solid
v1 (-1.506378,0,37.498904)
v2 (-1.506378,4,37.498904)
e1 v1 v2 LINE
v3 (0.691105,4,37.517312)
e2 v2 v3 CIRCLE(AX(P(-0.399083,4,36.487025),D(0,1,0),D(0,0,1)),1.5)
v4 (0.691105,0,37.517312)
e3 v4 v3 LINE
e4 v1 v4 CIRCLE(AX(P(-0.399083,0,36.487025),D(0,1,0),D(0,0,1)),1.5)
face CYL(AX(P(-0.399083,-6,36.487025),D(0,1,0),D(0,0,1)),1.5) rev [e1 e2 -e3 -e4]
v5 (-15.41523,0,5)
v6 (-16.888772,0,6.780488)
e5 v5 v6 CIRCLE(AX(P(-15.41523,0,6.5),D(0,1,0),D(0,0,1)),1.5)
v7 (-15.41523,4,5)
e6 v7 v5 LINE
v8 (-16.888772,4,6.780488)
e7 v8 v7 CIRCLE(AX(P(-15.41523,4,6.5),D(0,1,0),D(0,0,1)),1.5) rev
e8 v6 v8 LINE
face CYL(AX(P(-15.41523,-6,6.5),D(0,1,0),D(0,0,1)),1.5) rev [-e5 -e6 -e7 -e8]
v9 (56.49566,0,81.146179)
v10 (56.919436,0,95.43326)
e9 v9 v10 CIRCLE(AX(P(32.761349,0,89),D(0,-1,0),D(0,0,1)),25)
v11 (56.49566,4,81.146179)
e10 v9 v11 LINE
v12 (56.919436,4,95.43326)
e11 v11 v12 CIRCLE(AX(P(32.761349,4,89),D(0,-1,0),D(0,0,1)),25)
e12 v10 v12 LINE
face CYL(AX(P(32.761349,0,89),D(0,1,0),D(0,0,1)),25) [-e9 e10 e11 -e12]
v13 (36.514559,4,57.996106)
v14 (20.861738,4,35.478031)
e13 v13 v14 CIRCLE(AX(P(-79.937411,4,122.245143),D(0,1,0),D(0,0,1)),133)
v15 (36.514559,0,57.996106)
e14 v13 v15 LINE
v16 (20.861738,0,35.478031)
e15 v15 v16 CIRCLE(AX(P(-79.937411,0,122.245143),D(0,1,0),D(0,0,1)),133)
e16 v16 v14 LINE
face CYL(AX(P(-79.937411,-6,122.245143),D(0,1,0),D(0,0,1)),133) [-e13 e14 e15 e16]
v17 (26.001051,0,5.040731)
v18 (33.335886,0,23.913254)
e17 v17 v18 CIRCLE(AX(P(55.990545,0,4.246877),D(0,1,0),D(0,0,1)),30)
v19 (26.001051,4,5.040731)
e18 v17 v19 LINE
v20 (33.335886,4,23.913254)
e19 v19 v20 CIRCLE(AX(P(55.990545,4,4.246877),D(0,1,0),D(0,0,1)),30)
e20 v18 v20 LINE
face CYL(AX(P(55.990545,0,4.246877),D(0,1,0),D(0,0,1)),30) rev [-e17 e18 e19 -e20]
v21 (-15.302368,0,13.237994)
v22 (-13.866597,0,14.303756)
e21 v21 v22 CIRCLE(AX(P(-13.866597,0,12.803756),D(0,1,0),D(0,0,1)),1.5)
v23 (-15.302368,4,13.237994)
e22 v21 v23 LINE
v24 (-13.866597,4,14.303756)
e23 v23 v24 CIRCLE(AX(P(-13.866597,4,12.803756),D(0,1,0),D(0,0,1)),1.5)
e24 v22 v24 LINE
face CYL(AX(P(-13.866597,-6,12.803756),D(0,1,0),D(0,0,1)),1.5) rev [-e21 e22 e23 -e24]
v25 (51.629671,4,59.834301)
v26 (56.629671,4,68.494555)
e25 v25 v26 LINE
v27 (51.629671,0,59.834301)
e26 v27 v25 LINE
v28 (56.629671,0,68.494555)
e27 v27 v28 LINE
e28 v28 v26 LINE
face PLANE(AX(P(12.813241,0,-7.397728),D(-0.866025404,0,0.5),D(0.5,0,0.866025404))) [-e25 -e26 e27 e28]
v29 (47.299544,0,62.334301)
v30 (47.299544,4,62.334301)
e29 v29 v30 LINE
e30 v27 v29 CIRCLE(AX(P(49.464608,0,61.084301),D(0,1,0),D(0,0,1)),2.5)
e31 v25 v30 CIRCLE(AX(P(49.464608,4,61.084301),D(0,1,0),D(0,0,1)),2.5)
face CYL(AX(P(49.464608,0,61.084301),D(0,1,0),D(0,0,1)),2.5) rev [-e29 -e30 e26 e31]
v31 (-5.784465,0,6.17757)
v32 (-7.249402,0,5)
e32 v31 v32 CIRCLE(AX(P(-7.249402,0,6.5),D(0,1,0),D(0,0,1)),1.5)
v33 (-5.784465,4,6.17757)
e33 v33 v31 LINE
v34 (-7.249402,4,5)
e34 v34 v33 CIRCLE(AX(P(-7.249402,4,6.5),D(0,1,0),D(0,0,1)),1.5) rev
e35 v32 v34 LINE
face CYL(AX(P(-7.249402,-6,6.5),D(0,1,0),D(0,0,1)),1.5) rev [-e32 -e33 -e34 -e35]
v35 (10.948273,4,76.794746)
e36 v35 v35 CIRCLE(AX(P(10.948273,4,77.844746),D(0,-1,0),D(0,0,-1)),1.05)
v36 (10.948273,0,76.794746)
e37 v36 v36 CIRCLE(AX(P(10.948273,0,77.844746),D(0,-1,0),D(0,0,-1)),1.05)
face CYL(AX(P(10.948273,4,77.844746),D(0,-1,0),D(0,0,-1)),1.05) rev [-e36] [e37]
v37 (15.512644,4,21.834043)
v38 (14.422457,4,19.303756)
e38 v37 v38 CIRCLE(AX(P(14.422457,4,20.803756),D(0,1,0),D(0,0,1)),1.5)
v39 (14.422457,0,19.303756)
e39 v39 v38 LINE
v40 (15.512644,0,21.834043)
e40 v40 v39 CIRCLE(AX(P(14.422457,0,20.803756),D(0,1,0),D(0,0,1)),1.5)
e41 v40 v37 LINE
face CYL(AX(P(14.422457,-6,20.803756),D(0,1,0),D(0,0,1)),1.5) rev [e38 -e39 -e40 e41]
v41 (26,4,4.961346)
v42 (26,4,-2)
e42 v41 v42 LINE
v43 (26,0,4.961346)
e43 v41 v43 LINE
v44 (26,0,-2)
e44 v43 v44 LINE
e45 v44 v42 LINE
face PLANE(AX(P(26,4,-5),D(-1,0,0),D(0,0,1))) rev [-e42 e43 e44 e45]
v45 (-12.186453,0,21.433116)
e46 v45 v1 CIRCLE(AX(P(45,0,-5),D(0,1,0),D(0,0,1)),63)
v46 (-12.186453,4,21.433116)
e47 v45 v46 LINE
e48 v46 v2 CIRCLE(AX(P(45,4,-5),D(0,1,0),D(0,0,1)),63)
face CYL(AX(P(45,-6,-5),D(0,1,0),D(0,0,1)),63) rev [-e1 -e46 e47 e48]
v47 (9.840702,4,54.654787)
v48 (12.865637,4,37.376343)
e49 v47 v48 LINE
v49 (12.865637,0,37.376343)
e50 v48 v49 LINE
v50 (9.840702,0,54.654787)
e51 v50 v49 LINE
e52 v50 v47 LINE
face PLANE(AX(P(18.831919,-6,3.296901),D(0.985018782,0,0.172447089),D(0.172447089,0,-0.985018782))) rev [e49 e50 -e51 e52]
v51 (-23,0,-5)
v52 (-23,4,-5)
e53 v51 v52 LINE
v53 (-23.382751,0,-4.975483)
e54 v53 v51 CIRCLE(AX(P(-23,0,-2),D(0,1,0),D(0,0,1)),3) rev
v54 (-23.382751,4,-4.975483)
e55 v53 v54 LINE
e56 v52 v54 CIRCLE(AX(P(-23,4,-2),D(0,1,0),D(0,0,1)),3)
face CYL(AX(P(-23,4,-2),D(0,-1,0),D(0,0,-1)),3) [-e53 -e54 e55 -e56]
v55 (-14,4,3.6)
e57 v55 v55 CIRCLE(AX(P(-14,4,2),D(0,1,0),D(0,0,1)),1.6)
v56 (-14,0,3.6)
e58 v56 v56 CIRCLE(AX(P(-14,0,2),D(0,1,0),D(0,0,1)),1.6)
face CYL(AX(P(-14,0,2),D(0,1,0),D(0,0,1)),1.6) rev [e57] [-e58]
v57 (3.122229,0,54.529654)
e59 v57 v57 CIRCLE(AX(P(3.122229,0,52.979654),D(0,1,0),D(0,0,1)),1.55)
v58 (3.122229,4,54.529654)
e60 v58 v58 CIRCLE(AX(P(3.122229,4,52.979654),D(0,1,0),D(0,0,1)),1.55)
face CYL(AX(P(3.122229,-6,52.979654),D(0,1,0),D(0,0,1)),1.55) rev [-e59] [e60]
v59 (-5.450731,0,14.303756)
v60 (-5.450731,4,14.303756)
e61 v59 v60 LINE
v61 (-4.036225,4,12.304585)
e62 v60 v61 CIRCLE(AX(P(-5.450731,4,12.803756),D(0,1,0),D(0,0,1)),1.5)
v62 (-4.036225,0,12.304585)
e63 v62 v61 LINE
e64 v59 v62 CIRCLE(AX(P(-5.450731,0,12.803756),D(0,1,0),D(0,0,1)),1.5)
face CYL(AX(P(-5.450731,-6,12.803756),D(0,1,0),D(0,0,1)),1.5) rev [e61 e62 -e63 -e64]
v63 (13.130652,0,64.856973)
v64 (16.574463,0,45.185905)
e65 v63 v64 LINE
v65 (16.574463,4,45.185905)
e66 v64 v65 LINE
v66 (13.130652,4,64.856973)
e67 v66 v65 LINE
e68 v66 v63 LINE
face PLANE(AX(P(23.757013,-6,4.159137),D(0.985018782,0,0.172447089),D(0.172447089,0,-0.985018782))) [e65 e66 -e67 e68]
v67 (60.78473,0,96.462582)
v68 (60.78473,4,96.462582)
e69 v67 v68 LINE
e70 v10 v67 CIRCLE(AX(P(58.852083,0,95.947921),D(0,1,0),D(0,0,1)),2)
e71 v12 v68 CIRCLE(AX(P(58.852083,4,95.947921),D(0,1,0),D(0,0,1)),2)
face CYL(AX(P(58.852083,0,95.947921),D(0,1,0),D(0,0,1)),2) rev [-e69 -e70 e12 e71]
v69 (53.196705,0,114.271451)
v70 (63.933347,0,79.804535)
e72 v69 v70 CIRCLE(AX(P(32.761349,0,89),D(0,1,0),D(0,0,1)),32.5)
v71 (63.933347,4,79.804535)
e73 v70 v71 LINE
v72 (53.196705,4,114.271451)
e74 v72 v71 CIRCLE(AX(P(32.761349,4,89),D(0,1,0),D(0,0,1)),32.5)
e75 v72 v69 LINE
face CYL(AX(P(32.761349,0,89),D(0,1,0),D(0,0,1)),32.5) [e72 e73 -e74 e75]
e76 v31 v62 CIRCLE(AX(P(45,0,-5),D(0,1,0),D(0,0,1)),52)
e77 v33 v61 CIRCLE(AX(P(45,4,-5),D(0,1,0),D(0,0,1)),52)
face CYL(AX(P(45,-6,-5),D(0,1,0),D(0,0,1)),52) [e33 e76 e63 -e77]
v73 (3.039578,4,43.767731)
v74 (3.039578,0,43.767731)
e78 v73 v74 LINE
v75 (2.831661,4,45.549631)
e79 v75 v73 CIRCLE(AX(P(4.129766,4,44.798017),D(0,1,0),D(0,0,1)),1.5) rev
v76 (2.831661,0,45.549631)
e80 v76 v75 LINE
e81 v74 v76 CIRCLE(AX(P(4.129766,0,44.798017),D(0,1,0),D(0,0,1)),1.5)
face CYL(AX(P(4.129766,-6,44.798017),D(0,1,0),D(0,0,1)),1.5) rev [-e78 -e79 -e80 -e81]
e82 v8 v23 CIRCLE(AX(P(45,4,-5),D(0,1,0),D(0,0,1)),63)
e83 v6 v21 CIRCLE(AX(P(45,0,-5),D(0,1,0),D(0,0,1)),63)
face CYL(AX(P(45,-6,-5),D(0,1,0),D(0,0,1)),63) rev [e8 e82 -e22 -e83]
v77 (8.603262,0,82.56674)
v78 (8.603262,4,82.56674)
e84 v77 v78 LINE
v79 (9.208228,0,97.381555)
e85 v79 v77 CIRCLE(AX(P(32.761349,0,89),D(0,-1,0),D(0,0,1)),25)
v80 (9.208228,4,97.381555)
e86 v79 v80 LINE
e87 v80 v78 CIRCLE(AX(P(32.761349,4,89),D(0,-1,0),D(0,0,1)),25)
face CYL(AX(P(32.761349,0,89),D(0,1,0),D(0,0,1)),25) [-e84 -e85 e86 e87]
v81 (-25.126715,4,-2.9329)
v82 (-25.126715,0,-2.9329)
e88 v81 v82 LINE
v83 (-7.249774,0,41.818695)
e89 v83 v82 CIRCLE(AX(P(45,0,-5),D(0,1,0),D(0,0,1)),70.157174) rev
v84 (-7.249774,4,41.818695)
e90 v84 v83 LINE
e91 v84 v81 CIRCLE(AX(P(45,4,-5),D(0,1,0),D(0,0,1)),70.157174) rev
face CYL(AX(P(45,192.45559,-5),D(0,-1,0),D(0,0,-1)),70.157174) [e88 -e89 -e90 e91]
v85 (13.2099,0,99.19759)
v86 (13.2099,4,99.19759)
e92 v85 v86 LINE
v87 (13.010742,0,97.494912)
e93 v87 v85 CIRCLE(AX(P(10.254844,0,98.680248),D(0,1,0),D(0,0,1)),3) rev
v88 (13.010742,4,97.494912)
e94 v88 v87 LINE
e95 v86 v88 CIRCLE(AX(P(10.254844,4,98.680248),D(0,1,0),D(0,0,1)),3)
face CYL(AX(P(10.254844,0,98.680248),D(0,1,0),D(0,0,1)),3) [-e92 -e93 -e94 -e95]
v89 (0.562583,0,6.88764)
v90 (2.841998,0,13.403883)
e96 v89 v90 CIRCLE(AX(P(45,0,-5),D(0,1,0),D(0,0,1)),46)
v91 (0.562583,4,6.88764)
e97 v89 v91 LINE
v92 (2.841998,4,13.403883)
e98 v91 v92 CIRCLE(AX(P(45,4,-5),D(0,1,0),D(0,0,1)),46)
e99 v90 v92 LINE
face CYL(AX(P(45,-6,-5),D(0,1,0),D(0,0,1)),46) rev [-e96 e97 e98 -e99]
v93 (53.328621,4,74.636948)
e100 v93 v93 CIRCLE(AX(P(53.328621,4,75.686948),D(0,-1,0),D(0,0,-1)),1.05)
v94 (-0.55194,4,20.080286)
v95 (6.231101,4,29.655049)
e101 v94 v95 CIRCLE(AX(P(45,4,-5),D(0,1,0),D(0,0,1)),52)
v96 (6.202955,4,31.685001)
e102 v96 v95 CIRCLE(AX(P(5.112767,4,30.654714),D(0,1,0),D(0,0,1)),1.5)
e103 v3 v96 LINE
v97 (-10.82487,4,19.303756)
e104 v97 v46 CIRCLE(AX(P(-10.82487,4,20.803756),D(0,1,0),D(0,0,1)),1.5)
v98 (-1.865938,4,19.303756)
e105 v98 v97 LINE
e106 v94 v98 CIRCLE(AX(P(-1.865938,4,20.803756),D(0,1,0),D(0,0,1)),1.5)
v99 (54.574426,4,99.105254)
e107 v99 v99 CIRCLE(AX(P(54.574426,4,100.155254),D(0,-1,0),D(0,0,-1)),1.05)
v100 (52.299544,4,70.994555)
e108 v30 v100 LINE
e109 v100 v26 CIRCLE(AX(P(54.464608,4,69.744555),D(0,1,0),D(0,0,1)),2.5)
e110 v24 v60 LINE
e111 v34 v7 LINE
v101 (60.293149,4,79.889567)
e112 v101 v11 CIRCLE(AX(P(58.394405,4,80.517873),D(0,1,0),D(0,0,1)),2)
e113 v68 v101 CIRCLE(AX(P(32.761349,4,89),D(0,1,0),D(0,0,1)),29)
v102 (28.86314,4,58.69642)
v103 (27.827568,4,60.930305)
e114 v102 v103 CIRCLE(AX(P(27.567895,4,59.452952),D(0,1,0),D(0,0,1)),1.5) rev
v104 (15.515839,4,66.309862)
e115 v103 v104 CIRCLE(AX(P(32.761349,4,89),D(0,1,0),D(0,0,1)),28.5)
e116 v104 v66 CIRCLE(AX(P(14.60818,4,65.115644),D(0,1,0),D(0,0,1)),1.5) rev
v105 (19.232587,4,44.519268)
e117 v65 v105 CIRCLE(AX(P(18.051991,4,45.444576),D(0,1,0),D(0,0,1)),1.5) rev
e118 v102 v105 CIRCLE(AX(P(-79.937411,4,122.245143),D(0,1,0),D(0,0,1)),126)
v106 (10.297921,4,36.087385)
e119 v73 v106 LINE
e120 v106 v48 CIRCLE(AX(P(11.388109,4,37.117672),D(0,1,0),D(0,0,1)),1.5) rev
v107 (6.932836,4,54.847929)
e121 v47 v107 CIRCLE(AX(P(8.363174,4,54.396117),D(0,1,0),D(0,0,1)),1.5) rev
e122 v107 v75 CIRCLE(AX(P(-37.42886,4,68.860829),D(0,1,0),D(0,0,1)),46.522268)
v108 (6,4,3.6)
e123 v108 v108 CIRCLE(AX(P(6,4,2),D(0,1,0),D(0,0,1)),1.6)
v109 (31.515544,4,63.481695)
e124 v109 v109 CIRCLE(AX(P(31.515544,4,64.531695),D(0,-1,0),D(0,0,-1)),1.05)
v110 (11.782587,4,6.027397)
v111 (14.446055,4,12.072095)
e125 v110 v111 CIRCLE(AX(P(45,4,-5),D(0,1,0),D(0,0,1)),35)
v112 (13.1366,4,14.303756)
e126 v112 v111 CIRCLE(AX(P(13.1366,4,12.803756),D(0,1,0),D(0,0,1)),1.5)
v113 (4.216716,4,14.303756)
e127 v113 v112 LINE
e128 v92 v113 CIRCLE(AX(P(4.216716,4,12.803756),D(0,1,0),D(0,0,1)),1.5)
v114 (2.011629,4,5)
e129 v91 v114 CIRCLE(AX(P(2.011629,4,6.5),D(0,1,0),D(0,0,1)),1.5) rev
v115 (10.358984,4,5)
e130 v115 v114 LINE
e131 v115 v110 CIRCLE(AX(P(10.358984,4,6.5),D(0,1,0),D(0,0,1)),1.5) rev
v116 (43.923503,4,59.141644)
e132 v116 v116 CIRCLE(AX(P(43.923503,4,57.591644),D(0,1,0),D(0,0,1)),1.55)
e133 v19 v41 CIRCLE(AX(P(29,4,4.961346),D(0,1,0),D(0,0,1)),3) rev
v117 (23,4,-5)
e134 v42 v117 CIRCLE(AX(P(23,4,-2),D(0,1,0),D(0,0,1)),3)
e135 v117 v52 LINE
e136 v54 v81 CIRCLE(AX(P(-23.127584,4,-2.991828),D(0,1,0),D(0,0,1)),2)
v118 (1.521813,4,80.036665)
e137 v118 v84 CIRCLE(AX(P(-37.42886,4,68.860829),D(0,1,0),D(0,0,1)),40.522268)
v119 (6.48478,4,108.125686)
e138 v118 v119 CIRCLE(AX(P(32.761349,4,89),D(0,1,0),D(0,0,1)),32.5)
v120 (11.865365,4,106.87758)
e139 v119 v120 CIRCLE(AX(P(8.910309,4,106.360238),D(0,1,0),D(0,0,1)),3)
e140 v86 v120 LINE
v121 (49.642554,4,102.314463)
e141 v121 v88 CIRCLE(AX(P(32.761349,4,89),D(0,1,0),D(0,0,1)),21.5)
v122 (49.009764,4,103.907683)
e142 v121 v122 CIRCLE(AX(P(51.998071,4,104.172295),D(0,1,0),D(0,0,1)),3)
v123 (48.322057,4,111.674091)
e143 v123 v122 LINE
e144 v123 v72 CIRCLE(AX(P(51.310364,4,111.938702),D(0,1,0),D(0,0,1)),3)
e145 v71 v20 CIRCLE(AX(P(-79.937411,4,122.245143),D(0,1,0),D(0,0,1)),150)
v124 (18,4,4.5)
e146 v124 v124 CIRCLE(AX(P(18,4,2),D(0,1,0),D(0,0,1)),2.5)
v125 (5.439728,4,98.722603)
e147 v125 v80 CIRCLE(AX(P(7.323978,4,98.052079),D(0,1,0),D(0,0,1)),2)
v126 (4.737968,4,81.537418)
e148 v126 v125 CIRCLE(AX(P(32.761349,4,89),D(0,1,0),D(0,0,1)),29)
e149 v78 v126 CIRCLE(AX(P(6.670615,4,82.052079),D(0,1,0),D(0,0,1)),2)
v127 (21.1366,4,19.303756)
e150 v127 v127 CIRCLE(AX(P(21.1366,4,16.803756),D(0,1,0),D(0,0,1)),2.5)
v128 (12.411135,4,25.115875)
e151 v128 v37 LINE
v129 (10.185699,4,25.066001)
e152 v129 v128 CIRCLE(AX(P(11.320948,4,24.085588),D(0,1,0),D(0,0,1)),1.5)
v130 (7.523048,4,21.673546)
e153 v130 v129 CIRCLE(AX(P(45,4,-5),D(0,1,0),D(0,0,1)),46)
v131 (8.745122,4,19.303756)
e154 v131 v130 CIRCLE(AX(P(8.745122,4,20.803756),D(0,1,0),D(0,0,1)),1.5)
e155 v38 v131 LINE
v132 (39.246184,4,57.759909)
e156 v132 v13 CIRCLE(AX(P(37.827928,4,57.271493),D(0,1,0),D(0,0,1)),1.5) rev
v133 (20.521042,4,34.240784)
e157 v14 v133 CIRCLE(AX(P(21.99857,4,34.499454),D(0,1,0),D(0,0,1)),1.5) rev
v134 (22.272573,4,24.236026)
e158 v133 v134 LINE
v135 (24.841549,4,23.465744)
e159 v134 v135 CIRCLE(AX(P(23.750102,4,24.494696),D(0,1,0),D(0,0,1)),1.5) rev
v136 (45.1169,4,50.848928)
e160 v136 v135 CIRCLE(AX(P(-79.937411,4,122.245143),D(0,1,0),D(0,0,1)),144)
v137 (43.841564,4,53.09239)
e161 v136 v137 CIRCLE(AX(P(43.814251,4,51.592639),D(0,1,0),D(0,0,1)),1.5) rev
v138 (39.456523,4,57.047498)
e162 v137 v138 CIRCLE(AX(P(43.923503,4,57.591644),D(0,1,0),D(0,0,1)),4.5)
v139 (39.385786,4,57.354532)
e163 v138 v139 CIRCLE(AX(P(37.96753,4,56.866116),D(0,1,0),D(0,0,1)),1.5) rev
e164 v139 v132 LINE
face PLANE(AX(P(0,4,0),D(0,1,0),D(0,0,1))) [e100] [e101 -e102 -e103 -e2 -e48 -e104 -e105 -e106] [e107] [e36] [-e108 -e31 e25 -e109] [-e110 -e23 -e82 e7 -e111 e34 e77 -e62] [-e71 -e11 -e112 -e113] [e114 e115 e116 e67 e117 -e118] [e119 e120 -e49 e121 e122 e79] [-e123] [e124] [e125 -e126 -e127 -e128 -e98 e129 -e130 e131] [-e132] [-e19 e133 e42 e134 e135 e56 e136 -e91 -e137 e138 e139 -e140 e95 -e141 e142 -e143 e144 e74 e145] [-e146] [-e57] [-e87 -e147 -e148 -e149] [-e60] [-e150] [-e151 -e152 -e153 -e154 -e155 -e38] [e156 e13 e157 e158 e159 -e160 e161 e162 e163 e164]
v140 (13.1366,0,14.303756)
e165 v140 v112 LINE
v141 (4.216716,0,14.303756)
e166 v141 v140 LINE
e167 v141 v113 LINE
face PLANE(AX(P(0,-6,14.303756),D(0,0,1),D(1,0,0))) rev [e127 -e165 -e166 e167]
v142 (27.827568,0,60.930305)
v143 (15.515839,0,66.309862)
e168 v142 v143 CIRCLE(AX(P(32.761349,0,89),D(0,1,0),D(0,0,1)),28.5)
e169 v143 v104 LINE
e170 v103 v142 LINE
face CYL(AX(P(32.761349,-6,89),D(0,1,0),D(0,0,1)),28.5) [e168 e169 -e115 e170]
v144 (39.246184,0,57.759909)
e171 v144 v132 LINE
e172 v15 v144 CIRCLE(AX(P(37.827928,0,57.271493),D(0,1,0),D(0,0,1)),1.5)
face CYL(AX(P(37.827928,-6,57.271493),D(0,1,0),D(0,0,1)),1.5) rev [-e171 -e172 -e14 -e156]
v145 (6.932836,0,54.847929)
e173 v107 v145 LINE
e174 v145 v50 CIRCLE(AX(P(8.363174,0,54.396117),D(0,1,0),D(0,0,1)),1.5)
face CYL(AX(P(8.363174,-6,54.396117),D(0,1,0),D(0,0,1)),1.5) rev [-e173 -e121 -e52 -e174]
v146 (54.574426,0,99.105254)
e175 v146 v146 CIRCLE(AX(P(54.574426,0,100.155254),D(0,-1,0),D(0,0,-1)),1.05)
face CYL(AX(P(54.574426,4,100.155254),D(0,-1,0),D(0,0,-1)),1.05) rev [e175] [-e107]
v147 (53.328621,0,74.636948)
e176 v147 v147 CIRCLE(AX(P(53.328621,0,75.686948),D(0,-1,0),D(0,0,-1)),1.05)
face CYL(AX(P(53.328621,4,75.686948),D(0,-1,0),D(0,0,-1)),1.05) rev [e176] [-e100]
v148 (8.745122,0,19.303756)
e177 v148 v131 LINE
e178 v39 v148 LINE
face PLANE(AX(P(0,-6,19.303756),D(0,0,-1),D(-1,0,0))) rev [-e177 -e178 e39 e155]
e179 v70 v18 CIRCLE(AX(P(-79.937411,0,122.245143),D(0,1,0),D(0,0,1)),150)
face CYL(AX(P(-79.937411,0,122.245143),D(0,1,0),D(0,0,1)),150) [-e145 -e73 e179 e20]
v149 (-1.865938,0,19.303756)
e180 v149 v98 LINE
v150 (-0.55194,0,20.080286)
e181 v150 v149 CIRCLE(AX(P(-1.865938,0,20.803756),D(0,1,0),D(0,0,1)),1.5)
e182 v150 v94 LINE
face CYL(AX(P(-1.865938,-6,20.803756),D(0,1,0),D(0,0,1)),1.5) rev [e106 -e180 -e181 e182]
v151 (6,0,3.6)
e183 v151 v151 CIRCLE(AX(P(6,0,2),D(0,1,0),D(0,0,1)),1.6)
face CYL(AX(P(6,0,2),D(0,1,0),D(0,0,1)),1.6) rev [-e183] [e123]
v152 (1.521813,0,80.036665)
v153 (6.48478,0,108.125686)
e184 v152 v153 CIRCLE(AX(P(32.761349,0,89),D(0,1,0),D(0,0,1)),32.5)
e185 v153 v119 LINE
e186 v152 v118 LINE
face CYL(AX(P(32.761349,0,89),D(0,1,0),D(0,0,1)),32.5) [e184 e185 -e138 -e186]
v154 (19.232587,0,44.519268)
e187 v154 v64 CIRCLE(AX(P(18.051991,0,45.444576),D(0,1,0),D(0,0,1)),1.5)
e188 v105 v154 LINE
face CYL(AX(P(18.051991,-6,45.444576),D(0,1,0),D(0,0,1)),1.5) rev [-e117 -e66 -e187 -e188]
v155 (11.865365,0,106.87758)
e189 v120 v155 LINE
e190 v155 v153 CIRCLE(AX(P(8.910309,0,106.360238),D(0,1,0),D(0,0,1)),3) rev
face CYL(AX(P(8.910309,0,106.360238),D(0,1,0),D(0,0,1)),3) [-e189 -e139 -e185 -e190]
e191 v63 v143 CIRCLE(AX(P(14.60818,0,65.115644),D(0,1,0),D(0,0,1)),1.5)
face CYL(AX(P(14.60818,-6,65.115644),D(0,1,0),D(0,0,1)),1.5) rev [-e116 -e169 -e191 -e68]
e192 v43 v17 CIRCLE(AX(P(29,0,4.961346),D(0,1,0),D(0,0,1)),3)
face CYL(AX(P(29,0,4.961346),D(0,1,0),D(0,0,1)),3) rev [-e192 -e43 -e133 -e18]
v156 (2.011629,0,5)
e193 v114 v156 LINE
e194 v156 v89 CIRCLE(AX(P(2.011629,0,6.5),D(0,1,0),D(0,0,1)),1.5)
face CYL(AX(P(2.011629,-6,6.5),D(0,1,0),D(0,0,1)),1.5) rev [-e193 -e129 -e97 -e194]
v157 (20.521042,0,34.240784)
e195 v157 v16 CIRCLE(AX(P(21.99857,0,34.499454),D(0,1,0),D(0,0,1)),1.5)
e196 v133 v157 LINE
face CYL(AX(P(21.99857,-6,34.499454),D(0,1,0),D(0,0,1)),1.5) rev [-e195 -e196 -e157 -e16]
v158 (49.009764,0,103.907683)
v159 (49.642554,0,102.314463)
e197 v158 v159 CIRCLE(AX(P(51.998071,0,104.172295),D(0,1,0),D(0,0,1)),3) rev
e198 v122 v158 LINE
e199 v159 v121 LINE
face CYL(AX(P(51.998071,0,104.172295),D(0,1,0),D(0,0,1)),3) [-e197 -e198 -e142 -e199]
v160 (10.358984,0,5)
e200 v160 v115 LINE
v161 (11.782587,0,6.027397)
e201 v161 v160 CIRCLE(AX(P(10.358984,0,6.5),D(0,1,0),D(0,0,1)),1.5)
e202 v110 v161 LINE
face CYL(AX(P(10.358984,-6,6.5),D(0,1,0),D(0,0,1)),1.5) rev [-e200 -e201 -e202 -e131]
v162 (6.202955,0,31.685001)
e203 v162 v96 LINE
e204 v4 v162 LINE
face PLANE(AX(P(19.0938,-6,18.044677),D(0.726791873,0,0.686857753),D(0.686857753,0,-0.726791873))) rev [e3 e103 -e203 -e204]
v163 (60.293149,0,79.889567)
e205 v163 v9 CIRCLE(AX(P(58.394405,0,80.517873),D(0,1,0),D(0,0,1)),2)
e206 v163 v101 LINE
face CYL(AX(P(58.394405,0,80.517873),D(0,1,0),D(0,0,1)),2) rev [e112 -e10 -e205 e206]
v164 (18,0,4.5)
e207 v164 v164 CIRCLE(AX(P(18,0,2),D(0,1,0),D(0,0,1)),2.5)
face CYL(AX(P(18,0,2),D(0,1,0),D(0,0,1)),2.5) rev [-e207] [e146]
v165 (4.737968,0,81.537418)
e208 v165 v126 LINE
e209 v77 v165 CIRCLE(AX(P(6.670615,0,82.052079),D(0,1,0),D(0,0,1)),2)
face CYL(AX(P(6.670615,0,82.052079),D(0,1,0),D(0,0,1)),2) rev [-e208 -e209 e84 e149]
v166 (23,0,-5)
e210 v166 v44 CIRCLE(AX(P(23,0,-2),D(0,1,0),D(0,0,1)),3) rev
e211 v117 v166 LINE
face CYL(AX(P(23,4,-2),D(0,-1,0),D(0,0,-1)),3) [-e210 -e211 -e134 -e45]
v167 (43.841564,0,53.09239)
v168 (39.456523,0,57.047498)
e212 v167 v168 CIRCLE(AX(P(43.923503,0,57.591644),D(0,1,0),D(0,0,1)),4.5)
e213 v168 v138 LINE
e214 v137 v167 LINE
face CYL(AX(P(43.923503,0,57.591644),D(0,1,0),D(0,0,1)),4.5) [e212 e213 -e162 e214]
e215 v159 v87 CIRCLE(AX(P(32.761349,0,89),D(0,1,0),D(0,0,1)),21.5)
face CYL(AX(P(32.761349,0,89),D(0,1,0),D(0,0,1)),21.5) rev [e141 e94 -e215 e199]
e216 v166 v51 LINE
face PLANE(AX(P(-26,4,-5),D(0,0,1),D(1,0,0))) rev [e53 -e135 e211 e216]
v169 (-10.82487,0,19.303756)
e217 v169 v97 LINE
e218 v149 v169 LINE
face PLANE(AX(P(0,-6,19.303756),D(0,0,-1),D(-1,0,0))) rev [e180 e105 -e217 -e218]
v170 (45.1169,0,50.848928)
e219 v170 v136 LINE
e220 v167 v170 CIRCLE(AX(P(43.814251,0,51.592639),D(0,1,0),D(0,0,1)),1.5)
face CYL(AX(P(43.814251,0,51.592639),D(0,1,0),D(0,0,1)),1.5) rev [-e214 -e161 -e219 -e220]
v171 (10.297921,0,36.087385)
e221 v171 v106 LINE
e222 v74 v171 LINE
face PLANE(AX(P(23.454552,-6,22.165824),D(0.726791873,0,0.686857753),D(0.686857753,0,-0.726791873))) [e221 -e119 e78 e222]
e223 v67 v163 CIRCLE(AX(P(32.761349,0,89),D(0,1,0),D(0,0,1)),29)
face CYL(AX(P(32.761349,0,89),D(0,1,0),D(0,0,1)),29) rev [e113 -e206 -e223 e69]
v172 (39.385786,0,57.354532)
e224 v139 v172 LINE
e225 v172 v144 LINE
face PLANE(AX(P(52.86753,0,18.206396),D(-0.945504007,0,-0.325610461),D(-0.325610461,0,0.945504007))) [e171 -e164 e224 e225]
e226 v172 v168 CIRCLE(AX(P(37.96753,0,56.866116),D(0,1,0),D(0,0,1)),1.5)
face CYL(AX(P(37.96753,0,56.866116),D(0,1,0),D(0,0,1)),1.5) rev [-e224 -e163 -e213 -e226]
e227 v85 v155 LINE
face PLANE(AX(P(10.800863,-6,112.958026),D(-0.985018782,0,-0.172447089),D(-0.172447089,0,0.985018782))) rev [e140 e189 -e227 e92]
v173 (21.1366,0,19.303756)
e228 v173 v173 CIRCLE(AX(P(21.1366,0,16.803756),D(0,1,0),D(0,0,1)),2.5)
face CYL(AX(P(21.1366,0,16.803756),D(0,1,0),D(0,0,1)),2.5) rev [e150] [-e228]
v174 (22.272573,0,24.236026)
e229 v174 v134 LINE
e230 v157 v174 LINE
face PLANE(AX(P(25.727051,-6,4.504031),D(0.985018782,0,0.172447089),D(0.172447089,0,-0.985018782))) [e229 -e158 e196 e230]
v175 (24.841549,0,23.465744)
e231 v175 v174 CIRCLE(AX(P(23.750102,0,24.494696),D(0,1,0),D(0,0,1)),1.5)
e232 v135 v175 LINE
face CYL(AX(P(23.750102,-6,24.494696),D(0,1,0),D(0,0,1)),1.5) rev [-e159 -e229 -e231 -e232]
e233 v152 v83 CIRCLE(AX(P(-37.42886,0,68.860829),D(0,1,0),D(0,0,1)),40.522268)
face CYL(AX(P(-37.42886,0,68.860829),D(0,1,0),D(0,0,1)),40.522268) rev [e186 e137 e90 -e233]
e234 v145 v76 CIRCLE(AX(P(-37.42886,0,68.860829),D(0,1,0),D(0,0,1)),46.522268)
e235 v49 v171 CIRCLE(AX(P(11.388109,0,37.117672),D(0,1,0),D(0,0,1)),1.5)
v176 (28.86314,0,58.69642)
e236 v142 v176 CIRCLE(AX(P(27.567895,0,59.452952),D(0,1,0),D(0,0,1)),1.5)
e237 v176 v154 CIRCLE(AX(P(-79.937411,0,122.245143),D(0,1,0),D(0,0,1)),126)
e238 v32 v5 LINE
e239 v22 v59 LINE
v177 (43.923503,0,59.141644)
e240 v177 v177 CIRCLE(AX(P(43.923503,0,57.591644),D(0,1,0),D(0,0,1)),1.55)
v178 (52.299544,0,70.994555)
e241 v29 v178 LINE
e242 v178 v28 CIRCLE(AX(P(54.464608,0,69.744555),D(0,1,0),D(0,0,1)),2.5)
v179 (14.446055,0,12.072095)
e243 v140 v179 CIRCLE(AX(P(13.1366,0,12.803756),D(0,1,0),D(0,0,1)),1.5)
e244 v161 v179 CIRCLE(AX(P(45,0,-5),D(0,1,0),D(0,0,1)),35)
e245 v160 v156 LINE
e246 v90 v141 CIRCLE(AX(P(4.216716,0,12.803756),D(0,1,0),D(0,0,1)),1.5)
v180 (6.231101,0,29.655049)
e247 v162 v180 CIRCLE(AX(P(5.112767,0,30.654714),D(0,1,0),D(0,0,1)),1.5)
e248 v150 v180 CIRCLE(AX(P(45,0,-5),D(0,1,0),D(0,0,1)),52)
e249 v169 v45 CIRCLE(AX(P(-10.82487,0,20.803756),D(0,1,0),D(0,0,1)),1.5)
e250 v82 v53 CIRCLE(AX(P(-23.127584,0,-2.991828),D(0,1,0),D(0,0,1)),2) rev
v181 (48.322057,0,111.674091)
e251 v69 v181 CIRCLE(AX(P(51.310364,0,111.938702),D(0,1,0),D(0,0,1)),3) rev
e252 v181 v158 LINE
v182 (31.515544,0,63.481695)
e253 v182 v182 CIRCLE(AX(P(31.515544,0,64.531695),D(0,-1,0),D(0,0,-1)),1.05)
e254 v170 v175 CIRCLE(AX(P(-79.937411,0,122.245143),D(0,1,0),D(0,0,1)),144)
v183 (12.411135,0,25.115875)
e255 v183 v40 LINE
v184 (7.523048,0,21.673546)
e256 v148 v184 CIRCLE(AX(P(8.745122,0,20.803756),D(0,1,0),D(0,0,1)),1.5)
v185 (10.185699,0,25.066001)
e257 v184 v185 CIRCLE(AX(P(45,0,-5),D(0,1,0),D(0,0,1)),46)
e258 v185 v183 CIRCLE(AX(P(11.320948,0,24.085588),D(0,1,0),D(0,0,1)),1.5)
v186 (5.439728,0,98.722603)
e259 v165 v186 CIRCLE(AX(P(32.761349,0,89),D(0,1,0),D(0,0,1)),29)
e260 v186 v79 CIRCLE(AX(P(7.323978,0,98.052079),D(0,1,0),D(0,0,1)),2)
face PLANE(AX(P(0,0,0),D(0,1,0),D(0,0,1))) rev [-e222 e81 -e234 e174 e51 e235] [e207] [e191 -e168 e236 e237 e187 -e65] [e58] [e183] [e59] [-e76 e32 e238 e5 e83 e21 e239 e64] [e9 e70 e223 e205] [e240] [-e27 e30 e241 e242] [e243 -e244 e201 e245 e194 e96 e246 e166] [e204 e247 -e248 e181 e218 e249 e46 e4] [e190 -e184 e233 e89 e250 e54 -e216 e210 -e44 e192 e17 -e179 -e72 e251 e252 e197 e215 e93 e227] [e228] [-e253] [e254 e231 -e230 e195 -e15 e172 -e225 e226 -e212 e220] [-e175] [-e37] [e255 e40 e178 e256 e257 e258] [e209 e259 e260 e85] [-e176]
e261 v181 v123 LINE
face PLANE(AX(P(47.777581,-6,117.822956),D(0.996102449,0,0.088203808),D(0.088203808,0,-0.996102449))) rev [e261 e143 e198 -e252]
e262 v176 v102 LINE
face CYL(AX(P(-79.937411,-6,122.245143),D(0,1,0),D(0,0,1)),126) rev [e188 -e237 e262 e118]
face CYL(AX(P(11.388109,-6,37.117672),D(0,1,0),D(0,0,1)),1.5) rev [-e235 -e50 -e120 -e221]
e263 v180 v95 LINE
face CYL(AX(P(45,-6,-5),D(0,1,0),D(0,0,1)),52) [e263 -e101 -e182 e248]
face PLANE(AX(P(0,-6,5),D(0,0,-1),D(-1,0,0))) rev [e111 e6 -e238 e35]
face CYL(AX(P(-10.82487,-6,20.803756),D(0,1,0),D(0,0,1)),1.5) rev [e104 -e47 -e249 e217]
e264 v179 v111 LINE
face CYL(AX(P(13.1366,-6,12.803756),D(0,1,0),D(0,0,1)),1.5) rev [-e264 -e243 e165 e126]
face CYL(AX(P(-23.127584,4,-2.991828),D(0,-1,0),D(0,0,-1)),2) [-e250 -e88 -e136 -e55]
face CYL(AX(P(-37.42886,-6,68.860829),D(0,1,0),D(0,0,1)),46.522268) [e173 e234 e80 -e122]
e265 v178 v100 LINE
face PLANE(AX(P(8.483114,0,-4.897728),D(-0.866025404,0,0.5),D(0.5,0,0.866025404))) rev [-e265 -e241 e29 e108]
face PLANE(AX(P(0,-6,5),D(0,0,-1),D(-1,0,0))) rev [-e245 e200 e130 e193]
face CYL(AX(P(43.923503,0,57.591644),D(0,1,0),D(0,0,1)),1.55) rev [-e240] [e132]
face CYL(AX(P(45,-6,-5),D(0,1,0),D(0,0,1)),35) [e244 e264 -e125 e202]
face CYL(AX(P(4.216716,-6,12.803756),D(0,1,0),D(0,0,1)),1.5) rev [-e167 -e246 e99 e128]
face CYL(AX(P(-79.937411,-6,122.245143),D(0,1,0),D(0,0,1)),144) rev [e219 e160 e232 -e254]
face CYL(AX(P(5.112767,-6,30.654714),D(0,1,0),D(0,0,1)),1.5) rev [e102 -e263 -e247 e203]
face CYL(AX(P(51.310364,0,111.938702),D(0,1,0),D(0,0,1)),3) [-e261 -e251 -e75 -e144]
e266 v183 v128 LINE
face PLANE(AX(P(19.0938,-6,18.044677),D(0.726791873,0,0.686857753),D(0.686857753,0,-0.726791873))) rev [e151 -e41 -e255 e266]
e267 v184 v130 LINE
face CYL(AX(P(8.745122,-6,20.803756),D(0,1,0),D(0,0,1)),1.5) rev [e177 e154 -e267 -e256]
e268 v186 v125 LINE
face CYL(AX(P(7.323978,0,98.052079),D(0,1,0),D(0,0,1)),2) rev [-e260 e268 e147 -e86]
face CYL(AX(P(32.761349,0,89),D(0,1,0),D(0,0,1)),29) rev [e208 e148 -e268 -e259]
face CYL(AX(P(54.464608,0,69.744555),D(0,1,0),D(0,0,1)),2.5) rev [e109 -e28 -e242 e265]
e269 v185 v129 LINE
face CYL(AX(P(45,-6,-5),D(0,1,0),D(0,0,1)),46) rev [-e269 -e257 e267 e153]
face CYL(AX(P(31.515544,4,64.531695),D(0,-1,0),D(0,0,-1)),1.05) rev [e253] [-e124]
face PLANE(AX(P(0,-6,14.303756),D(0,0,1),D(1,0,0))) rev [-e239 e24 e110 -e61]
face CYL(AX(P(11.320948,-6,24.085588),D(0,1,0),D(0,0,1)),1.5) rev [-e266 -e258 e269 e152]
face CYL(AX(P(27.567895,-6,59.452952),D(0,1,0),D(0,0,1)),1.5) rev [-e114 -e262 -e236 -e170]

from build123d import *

# Parameters (mm, degrees)
SKETCH_1_W           = 52
SKETCH_1_H           = 10
EXTRUDE_1_DEPTH      = 4
SKETCH_2_R           = 1.6
CUT_EXTRUDE_1_DEPTH  = 4
EXTRUDE_3_DEPTH      = 4
SKETCH_4_R           = 21.5
CUT_EXTRUDE_2_DEPTH  = 4
SKETCH_5_R           = 1.05
CUT_EXTRUDE_3_DEPTH  = 4
CUT_EXTRUDE_4_DEPTH  = 10
CUT_EXTRUDE_5_DEPTH  = 10
CUT_EXTRUDE_6_DEPTH  = 10
EXTRUDE_START        = -4
SKETCH_11_R          = 4.5
EXTRUDE_4_DEPTH      = 4
SKETCH_12_R          = 1.55
CUT_EXTRUDE_7_DEPTH  = 4
CUT_EXTRUDE_9_DEPTH  = 10
FILLET_5_R           = 3
SKETCH_15_R          = 1.55
CUT_EXTRUDE_10_DEPTH = 10
CUT_EXTRUDE_11_DEPTH = 4
FILLET_6_R           = 1.5
SKETCH_18_R          = 2.5
SKETCH_18_R_2        = 1.6
CUT_EXTRUDE_12_DEPTH = 4
CUT_EXTRUDE_START    = -4
CUT_EXTRUDE_13_DEPTH = 4
FILLET_7_R           = 2


# Read off the part's stored shape, not the designer's step: 切除-拉伸13
with BuildPart() as part:
    # 草图1 → 凸台-拉伸1 (new body)
    with BuildSketch(Plane(origin=(0, 0, 0), x_dir=(1, 0, 0), z_dir=(0, 1, 0))):
        Rectangle(SKETCH_1_W, SKETCH_1_H)
    extrude(amount=EXTRUDE_1_DEPTH)

    # 草图2 → 切除-拉伸1 (cut)
    with BuildSketch(Plane(origin=(0, 4, 0), x_dir=(1, 0, 0), z_dir=(0, 1, 0))):
        with Locations(Location((-14, -2, 0), (0, 0, 270))):
            Circle(SKETCH_2_R)
        with Locations(Location((6, -2, 0), (0, 0, 270))):
            Circle(SKETCH_2_R)
    extrude(amount=-CUT_EXTRUDE_1_DEPTH, mode=Mode.SUBTRACT)

    # 草图3 → 凸台-拉伸3 (add)
    with BuildSketch(Plane(origin=(0, 4, 0), x_dir=(1, 0, 0), z_dir=(0, 1, 0))):
        with BuildLine():
            ThreePointArc((1.521813045, -80.036664835), (32.882226801, -121.499775209), (63.933346813, -79.804535446))
            ThreePointArc((63.933346813, -79.804535446), (51.636617213, -50.215459979), (33.335884345, -23.913252421))
            ThreePointArc((33.335884345, -23.913252421), (28.020789941, -15.095507245), (26, -5))
            Line((26, -5), (-26, -5))
            ThreePointArc((-26, -5), (-23.512302629, -22.658936218), (-12.646779094, -36.799907362))
            ThreePointArc((-12.646779094, -36.799907362), (1.078545586, -56.242035351), (1.521813045, -80.036664835))
        make_face()
    extrude(amount=-EXTRUDE_3_DEPTH)

    # 草图4 → 切除-拉伸2 (cut)
    with BuildSketch(Plane(origin=(0, 4, 0), x_dir=(1, 0, 0), z_dir=(0, 1, 0))):
        with Locations(Location((32.761349256, -89, 0), (0, 0, 270))):
            Circle(SKETCH_4_R)
    extrude(amount=-CUT_EXTRUDE_2_DEPTH, mode=Mode.SUBTRACT)

    # 草图5 → 切除-拉伸3 (cut)
    with BuildSketch(Plane.XZ):
        with Locations(Location((31.515544041, 64.531694596, 0), (0, 0, 270))):
            Circle(SKETCH_5_R)
        with Locations(Location((10.948272581, 77.844746262, 0), (0, 0, 270))):
            Circle(SKETCH_5_R)
        with Locations(Location((12.194077796, 102.313051667, 0), (0, 0, 270))):
            Circle(SKETCH_5_R)
        with Locations(Location((34.007154472, 113.468305404, 0), (0, 0, 270))):
            Circle(SKETCH_5_R)
        with Locations(Location((54.574425932, 100.155253738, 0), (0, 0, 270))):
            Circle(SKETCH_5_R)
        with Locations(Location((53.328620717, 75.686948333, 0), (0, 0, 270))):
            Circle(SKETCH_5_R)
    extrude(amount=-CUT_EXTRUDE_3_DEPTH, mode=Mode.SUBTRACT)

    # 草图8 → 切除-拉伸4 (cut)
    with BuildSketch(Plane(origin=(0, 4, 0), x_dir=(1, 0, 0), z_dir=(0, 1, 0))):
        with BuildLine():
            Line((45.98329313, -118.688890181), (48.203895401, -103.959203474))
            ThreePointArc((48.203895401, -103.959203474), (29.304772302, -110.220322235), (13.369657115, -98.285056591))
            Line((13.369657115, -98.285056591), (10.800862536, -112.958026275))
            ThreePointArc((10.800862536, -112.958026275), (27.53629107, -121.077231286), (45.98329313, -118.688890181))
        make_face()
    extrude(amount=-CUT_EXTRUDE_4_DEPTH, mode=Mode.SUBTRACT)

    # 草图9 → 切除-拉伸5 (cut)
    with BuildSketch(Plane(origin=(0, 4, 0), x_dir=(1, 0, 0), z_dir=(0, 1, 0))):
        with BuildLine():
            ThreePointArc((2.261304319, -44.591253126), (6.28220686, -52.93399338), (8.570902162, -61.907891418))
            Line((8.570902162, -61.907891418), (13.726418113, -32.459554104))
            Line((13.726418113, -32.459554104), (2.261304319, -44.591253126))
        make_face()
        with BuildLine():
            ThreePointArc((-4.036224589, -12.304585463), (-5.165941762, -8.688618892), (-6.029403289, -5))
            Line((-6.029403289, -5), (-17.20128616, -5))
            ThreePointArc((-17.20128616, -5), (-16.390165734, -9.150885172), (-15.302367858, -13.237994154))
            ThreePointArc((-15.302367858, -13.237994154), (-14.76064503, -14.008197341), (-13.866597194, -14.303756198))
            Line((-13.866597194, -14.303756198), (-5.450731068, -14.303756198))
            ThreePointArc((-5.450731068, -14.303756198), (-4.226240132, -13.67014061), (-4.036224589, -12.304585463))
        make_face()
        with BuildLine():
            ThreePointArc((13.136599911, -14.303756198), (13.910931188, -14.088439455), (14.462960482, -13.504304294))
            ThreePointArc((14.462960482, -13.504304294), (14.636495421, -12.786051458), (14.446054709, -12.072094984))
            ThreePointArc((14.446054709, -12.072094984), (12.758027899, -8.618194999), (11.458980338, -5))
            Line((11.458980338, -5), (0.100111359, -5))
            ThreePointArc((0.100111359, -5), (1.268714012, -9.267958013), (2.841998417, -13.403882811))
            ThreePointArc((2.841998417, -13.403882811), (3.395189817, -14.05878407), (4.21671586, -14.303756198))
            Line((4.21671586, -14.303756198), (13.136599911, -14.303756198))
        make_face()
        with BuildLine():
            ThreePointArc((29.973452999, -60.636685059), (23.981149414, -50.992543614), (17.145000635, -41.926991433))
            Line((17.145000635, -41.926991433), (12.394033631, -69.064542789))
            ThreePointArc((12.394033631, -69.064542789), (20.440709832, -63.300742342), (29.973452999, -60.636685059))
        make_face()
        with BuildLine():
            ThreePointArc((35.754959969, -56.638166076), (38.556099012, -57.020774317), (41.313388497, -57.645373151))
            Line((41.313388497, -57.645373151), (46.097332926, -52.594274703))
            ThreePointArc((46.097332926, -52.594274703), (35.503275522, -36.166992281), (22.782062805, -21.325819581))
            Line((22.782062805, -21.325819581), (20.398205396, -34.942427066))
            ThreePointArc((20.398205396, -34.942427066), (28.619942986, -45.405693363), (35.754959969, -56.638166076))
        make_face()
        with BuildLine():
            ThreePointArc((15.512644471, -21.834042827), (15.80003242, -20.21022016), (14.422456661, -19.303756198))
            Line((14.422456661, -19.303756198), (8.745122175, -19.303756198))
            ThreePointArc((8.745122175, -19.303756198), (7.411952212, -20.116255035), (7.523047642, -21.673545732))
            ThreePointArc((7.523047642, -21.673545732), (8.814595067, -23.40099417), (10.185698616, -25.06600105))
            ThreePointArc((10.185698616, -25.06600105), (10.740014236, -25.468525591), (11.415497527, -25.582605109))
            ThreePointArc((11.415497527, -25.582605109), (11.95762664, -25.443763133), (12.411135384, -25.115874602))
            Line((12.411135384, -25.115874602), (15.512644471, -21.834042827))
        make_face()
        with BuildLine():
            ThreePointArc((-1.506377954, -37.498903628), (-0.411648069, -37.986972344), (0.691104569, -37.5173116))
            Line((0.691104569, -37.5173116), (6.202954756, -31.685000754))
            ThreePointArc((6.202954756, -31.685000754), (6.612622783, -30.675510032), (6.231100583, -29.655049243))
            ThreePointArc((6.231100583, -29.655049243), (2.568643561, -25.059607296), (-0.551939961, -20.080286398))
            ThreePointArc((-0.551939961, -20.080286398), (-1.102788408, -19.512399411), (-1.865938229, -19.303756198))
            Line((-1.865938229, -19.303756198), (-10.824870498, -19.303756198))
            ThreePointArc((-10.824870498, -19.303756198), (-12.088603037, -19.995684376), (-12.186452705, -21.433116105))
            ThreePointArc((-12.186452705, -21.433116105), (-7.465018486, -29.877239502), (-1.506377954, -37.498903628))
        make_face()
    extrude(amount=-CUT_EXTRUDE_5_DEPTH, mode=Mode.SUBTRACT)

    # 草图10 → 切除-拉伸6 (cut)
    with BuildSketch(Plane(origin=(0, 4, 0), x_dir=(1, 0, 0), z_dir=(0, 1, 0))):
        with BuildLine():
            ThreePointArc((-26, -5), (-21.816679344, -21.010216482), (-14.074474337, -35.635040075))
            ThreePointArc((-14.074474337, -35.635040075), (-23.857818501, -21.80478562), (-26, -5))
        make_face()
    extrude(amount=-CUT_EXTRUDE_6_DEPTH, mode=Mode.SUBTRACT)

    # 草图11 → 凸台-拉伸4 (add)
    with BuildSketch(Plane(origin=(0, 4, 0), x_dir=(1, 0, 0), z_dir=(0, 1, 0)).offset(EXTRUDE_START)):
        with Locations((43.923502836, -57.591644213)):
            Circle(SKETCH_11_R)
        with BuildLine():
            Line((12.488002369, -103.321073663), (12.812973446, -101.464836968))
            ThreePointArc((12.812973446, -101.464836968), (11.159808075, -102.131982223), (12.488002369, -103.321073663))
        make_face()
    extrude(amount=EXTRUDE_4_DEPTH)

    # 草图12 → 切除-拉伸7 (cut)
    with BuildSketch(Plane(origin=(0, 4, 0), x_dir=(1, 0, 0), z_dir=(0, 1, 0))):
        with Locations(Location((43.923502836, -57.591644213, 0), (0, 0, 270))):
            Circle(SKETCH_12_R)
    extrude(amount=-CUT_EXTRUDE_7_DEPTH, mode=Mode.SUBTRACT)

    # 草图14 → 切除-拉伸9 (cut)
    with BuildSketch(Plane(origin=(0, 4, 0), x_dir=(1, 0, 0), z_dir=(0, 1, 0))):
        with BuildLine():
            Line((47.77758134, -117.822955678), (49.091476898, -102.984882238))
            ThreePointArc((49.091476898, -102.984882238), (48.655153878, -103.478845764), (48.203895401, -103.959203474))
            Line((48.203895401, -103.959203474), (45.98329313, -118.688890181))
            ThreePointArc((45.98329313, -118.688890181), (46.887074229, -118.269675331), (47.77758134, -117.822955678))
        make_face()
    extrude(amount=-CUT_EXTRUDE_9_DEPTH, mode=Mode.SUBTRACT)

    # 圆角5
    fillet_5_edges = [part.edges().sort_by_distance(p)[0] for p in [
        (-14.074474337, 2, 35.635040075),
        (49.091476898, 2, 102.984882238),
        (47.77758134, 2, 117.822955678),
        (26, 2, 5),
        (-26, 2, 5),
        (-26, 2, -5),
        (26, 2, -5),
        (13.369657115, 2, 98.285056591),
        (10.800862536, 2, 112.958026275),
    ]]
    fillet(fillet_5_edges, radius=FILLET_5_R)

    # 草图15 → 切除-拉伸10 (cut)
    with BuildSketch(Plane(origin=(0, 4, 0), x_dir=(1, 0, 0), z_dir=(0, 1, 0))):
        with Locations(Location((3.122228964, -52.979654288, 0), (0, 0, 270))):
            Circle(SKETCH_15_R)
    extrude(amount=-CUT_EXTRUDE_10_DEPTH, mode=Mode.SUBTRACT)

    # 草图17 → 切除-拉伸11 (cut)
    with BuildSketch(Plane(origin=(0, 4, 0), x_dir=(1, 0, 0), z_dir=(0, 1, 0))):
        with BuildLine():
            Line((47.299544417, -62.334301422), (52.299544417, -70.99455546))
            ThreePointArc((52.299544417, -70.99455546), (55.714607926, -71.909618969), (56.629671436, -68.49455546))
            Line((56.629671436, -68.49455546), (51.629671436, -59.834301422))
            ThreePointArc((51.629671436, -59.834301422), (48.214607926, -58.919237913), (47.299544417, -62.334301422))
        make_face()
        with BuildLine():
            Line((39.44111887, -57.193857859), (38.127043054, -61.009656485))
            ThreePointArc((38.127043054, -61.009656485), (36.961437554, -58.812822159), (35.754959969, -56.638166076))
            ThreePointArc((35.754959969, -56.638166076), (37.606013339, -56.863117296), (39.44111887, -57.193857859))
        make_face()
        with BuildLine():
            ThreePointArc((47.059341861, -54.364181803), (46.282476668, -53.759511326), (45.39271321, -53.338243118))
            Line((45.39271321, -53.338243118), (46.097332926, -52.594274703))
            ThreePointArc((46.097332926, -52.594274703), (46.581432397, -53.477546007), (47.059341861, -54.364181803))
        make_face()
    extrude(amount=-CUT_EXTRUDE_11_DEPTH, mode=Mode.SUBTRACT)

    # 圆角6
    fillet_6_edges = [part.edges().sort_by_distance(p)[0] for p in [
        (0.100111359, 2, 5),
        (11.458980338, 2, 5),
        (-6.029403289, 2, 5),
        (-17.20128616, 2, 5),
        (12.394033631, 2, 69.064542789),
        (17.145000635, 2, 41.926991433),
        (29.973452999, 2, 60.636685059),
        (8.570902162, 2, 61.907891418),
        (2.261304319, 2, 44.591253126),
        (13.726418113, 2, 32.459554104),
        (20.398205396, 2, 34.942427066),
        (22.782062805, 2, 21.325819581),
        (39.44111887, 2, 57.193857859),
        (47.059341861, 2, 54.364181803),
        (38.127043054, 2, 61.009656485),
    ]]
    fillet(fillet_6_edges, radius=FILLET_6_R)

    # 草图18 → 切除-拉伸12 (cut)
    with BuildSketch(Plane(origin=(0, 4, 0), x_dir=(1, 0, 0), z_dir=(0, 1, 0))):
        with Locations(Location((18, -2, 0), (0, 0, 270))):
            Circle(SKETCH_18_R)
        with Locations(Location((21.136599911, -16.803756198, 0), (0, 0, 270))):
            Circle(SKETCH_18_R)
        with Locations(Location((6, -2, 0), (0, 0, 270))):
            Circle(SKETCH_18_R_2)
        with BuildLine():
            ThreePointArc((4.73796843, -81.537418203), (3.78549795, -90.183233304), (5.439728086, -98.722603388))
            ThreePointArc((5.439728086, -98.722603388), (7.994502194, -99.936328752), (9.208227558, -97.381554645))
            ThreePointArc((9.208227558, -97.381554645), (7.782167095, -90.02002871), (8.603262337, -82.56673983))
            ThreePointArc((8.603262337, -82.56673983), (7.185276197, -80.119432063), (4.73796843, -81.537418203))
        make_face()
        with BuildLine():
            ThreePointArc((60.784730082, -96.462581797), (61.748600489, -88.140194236), (60.293149381, -79.889567415))
            ThreePointArc((60.293149381, -79.889567415), (57.76609885, -78.619128274), (56.495659709, -81.146178806))
            ThreePointArc((56.495659709, -81.146178806), (57.75035894, -88.258788135), (56.919436175, -95.43326017))
            ThreePointArc((56.919436175, -95.43326017), (58.337422315, -97.880567937), (60.784730082, -96.462581797))
        make_face()
    extrude(amount=-CUT_EXTRUDE_12_DEPTH, mode=Mode.SUBTRACT)

    # 切除-拉伸13 outline → 切除-拉伸13 (cut)
    with BuildSketch(Plane(origin=(0, 4, 0), x_dir=(1, 0, 0), z_dir=(0, 1, 0)).offset(CUT_EXTRUDE_START)):
        with BuildLine():
            ThreePointArc((-12.646779619, -36.799906956), (-9.833941896, -39.186349614), (-7.249774204, -41.818694949))
            ThreePointArc((-7.249774204, -41.818694949), (-20.363813597, -20.487270806), (-25.15128429, 4.090927044))
            ThreePointArc((-25.15128429, 4.090927044), (-25.779734958, 3.128305617), (-26, 2))
            Line((-26, 2), (-26, -4.787512325))
            ThreePointArc((-26, -4.787512325), (-25.992340011, -5.001758122), (-25.969399159, -5.214909838))
            ThreePointArc((-25.969399159, -5.214909838), (-21.851695099, -20.92008608), (-14.306127818, -35.296193409))
            ThreePointArc((-14.306127818, -35.296193409), (-14.05130657, -35.620735597), (-13.754363003, -35.907242174))
            ThreePointArc((-13.754363003, -35.907242174), (-13.205106931, -36.359202184), (-12.646779619, -36.799906956))
        make_face()
    extrude(amount=CUT_EXTRUDE_13_DEPTH, mode=Mode.SUBTRACT)

    # 圆角7
    fillet_7_edges = [part.edges().sort_by_distance(p)[0] for p in [
        (-25.15128429, 2, -4.090927044),
    ]]
    fillet(fillet_7_edges, radius=FILLET_7_R)


solid = part.part
